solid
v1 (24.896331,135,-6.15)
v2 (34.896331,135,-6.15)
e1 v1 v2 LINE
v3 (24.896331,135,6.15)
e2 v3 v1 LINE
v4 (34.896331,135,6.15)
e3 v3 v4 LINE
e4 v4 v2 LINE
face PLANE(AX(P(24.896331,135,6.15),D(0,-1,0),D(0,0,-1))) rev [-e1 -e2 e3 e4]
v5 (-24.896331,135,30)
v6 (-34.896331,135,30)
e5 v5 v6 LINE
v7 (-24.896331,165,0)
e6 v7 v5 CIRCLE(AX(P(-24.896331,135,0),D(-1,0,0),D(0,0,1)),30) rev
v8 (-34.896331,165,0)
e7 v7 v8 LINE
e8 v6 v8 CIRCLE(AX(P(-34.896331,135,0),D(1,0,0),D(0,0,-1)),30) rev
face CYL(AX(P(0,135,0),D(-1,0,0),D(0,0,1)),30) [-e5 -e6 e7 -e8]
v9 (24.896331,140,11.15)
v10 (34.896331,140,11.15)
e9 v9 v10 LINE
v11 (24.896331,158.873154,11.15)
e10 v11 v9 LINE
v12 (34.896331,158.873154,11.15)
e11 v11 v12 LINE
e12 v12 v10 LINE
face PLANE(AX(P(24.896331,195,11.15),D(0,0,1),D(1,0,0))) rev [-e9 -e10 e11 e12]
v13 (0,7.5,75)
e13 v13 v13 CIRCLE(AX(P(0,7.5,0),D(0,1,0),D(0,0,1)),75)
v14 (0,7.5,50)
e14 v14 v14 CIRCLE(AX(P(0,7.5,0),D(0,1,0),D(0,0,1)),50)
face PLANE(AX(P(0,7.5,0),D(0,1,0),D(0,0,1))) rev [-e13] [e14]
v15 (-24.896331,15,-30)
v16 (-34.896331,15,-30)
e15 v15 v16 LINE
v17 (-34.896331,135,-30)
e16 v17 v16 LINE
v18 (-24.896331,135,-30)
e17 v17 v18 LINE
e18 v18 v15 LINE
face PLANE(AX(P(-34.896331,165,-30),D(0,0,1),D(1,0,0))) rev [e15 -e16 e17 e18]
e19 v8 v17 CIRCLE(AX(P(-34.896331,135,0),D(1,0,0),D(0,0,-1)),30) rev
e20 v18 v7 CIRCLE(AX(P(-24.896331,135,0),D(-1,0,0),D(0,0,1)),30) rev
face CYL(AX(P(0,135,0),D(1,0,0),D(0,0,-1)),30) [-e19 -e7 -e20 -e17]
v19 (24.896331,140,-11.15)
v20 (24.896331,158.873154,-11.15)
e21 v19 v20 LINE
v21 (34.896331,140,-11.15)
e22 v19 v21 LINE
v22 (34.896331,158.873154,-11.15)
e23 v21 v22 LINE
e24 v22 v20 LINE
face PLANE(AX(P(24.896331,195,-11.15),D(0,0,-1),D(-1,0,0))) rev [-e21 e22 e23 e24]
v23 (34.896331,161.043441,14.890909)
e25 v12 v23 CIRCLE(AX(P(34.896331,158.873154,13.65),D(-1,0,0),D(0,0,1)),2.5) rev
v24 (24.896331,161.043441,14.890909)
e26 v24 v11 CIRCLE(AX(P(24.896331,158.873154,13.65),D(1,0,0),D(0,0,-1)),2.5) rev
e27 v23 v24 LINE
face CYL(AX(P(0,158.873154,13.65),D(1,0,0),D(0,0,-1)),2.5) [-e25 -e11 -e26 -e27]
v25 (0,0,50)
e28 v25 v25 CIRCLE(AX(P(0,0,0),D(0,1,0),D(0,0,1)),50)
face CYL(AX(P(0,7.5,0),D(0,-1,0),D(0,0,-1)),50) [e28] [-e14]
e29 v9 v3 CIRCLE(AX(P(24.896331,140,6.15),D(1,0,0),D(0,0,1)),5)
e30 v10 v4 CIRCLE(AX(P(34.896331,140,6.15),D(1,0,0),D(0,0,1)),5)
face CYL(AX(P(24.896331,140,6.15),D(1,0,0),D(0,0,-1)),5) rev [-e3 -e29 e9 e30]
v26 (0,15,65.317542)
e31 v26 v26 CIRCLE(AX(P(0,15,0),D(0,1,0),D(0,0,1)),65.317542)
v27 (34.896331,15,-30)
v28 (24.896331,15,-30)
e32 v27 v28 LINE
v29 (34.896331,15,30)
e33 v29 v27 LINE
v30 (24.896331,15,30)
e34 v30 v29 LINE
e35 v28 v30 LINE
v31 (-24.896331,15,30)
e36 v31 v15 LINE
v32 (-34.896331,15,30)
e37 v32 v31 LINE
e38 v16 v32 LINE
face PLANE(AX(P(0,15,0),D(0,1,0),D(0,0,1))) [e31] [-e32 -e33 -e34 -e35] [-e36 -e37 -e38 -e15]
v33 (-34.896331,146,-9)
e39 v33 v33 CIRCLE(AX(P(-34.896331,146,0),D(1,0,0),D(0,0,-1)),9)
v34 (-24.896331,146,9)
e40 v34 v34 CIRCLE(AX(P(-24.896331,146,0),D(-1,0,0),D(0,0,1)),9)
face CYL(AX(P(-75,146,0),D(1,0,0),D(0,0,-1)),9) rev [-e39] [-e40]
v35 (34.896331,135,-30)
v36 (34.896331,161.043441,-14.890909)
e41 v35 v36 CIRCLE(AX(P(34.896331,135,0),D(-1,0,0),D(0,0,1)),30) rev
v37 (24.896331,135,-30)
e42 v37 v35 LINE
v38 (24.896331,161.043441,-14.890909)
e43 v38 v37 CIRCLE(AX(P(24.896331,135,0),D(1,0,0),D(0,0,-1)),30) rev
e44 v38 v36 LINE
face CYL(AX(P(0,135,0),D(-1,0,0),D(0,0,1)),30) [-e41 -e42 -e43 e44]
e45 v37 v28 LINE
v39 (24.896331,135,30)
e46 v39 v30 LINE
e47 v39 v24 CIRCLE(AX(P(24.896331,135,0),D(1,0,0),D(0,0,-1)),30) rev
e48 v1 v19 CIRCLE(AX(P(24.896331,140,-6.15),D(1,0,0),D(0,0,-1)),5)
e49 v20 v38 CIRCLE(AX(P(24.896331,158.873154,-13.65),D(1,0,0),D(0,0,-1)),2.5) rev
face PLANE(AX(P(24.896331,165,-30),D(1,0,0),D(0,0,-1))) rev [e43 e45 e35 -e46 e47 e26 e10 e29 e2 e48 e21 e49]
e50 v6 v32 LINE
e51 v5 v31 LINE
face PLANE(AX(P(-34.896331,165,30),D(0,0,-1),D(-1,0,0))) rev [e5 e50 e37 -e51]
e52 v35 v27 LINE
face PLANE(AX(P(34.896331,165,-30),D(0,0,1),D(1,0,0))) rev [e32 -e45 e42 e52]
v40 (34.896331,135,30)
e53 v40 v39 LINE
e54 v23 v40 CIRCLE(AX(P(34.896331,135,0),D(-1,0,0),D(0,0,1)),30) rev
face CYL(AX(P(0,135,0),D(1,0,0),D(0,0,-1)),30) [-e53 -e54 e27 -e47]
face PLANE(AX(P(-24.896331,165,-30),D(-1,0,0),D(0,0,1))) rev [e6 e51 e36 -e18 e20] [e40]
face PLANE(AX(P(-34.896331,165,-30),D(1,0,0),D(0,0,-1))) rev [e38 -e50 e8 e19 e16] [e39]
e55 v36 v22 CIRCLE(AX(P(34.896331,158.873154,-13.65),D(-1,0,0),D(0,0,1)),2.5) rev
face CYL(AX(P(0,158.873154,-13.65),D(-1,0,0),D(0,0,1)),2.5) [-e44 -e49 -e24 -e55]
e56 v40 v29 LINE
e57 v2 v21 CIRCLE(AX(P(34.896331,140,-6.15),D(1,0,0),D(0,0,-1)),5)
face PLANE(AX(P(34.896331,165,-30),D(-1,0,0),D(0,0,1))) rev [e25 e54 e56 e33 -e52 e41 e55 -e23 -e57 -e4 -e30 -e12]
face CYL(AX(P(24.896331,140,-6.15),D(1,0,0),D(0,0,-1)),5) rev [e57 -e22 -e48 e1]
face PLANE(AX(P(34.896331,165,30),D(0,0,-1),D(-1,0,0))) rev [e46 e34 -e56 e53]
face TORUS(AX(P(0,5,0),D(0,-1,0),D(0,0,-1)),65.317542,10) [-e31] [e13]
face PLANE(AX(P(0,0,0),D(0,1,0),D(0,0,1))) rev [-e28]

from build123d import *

# Parameters (mm, degrees)
SKETCH1_R           = 50
BOSS_EXTRUDE1_DEPTH = 7.5
SKETCH2_R           = 75
BOSS_EXTRUDE2_DEPTH = 7.5
SKETCH3_W           = 10
SKETCH3_H           = 60
BOSS_EXTRUDE3_DEPTH = 150
FILLET1_R           = 30
FILLET2_R           = 10
CUT_EXTRUDE1_DEPTH  = 10
FILLET3_R           = 2.5
SKETCH5_R           = 9
CUT_EXTRUDE6_DEPTH  = 212.960382158


# Some blends are built 0.0001 mm under size
with BuildPart() as part:
    # Sketch1 → Boss-Extrude1 (new body)
    with BuildSketch(Plane(origin=(0, 0, 0), x_dir=(1, 0, 0), z_dir=(0, 1, 0))):
        with Locations(Location((0, 0, 0), (0, 0, 270))):
            Circle(SKETCH1_R)
    extrude(amount=BOSS_EXTRUDE1_DEPTH)

    # Sketch2 → Boss-Extrude2 (add)
    with BuildSketch(Plane(origin=(0, 7.5, 0), x_dir=(1, 0, 0), z_dir=(0, 1, 0))):
        with Locations(Location((0, 0, 0), (0, 0, 270))):
            Circle(SKETCH2_R)
    extrude(amount=BOSS_EXTRUDE2_DEPTH)

    # Sketch3 → Boss-Extrude3 (add)
    with BuildSketch(Plane(origin=(0, 15, 0), x_dir=(1, 0, 0), z_dir=(0, 1, 0))):
        with Locations((29.896331169, 0)):
            Rectangle(SKETCH3_W, SKETCH3_H)
        with Locations((-29.896331169, 0)):
            Rectangle(SKETCH3_W, SKETCH3_H)
    extrude(amount=BOSS_EXTRUDE3_DEPTH)

    # Fillet1
    fillet1_edges = [part.edges().sort_by_distance(p)[0] for p in [
        (29.896331169, 165, 30),
        (-29.896331169, 165, 30),
        (-29.896331169, 165, -30),
        (29.896331169, 165, -30),
    ]]
    fillet(fillet1_edges, radius=FILLET1_R - 0.0001)  # a hair under: the kernel refuses the full size

    # Fillet2
    # the kernel refuses this fillet: 10 mm, written as the material it takes off along each edge
    with BuildSketch(Plane(origin=(0, 15, 0), x_dir=(0, 0, 1), z_dir=(-1, 0, 0))) as fillet2_piece_1:
        with BuildLine():
            CenterArc((65.317541634, -10), FILLET2_R, 14.477512186, 75.522487814)
            Line((75, -7.5), (75.193649167, -7.45))
            ThreePointArc((75.193649167, -7.45), (75.2, -3.75), (75.2, 0))
            Line((75.2, 0), (75, 0.2))
            Line((75, 0.2), (65.317541634, 0.2))
            Line((65.317541634, 0.2), (65.317541634, 0))
        make_face()
    revolve(axis=Axis((0, 15, 0), (0, 1, 0)), mode=Mode.SUBTRACT)

    # Sketch4 → Cut-Extrude1 (cut)
    with BuildSketch(Plane(origin=(34.896331169, 0, 0), x_dir=(0, 0, -1), z_dir=(1, 0, 0))):
        with BuildLine():
            Line((-11.15, 195), (11.15, 195))
            Line((11.15, 195), (11.15, 140))
            ThreePointArc((11.15, 140), (9.685533906, 136.464466094), (6.15, 135))
            Line((6.15, 135), (-6.15, 135))
            ThreePointArc((-6.15, 135), (-9.685533906, 136.464466094), (-11.15, 140))
            Line((-11.15, 140), (-11.15, 195))
        make_face()
    extrude(amount=-CUT_EXTRUDE1_DEPTH, mode=Mode.SUBTRACT)

    # Fillet3
    fillet3_edges = [part.edges().sort_by_distance(p)[0] for p in [
        (29.896331169, 162.851019733, 11.15),
        (29.896331169, 162.851019733, -11.15),
    ]]
    fillet(fillet3_edges, radius=FILLET3_R)

    # Sketch5 → Cut-Extrude6 (cut, through all)
    with BuildSketch(Plane(origin=(34.896331169, 0, 0), x_dir=(0, 0, -1), z_dir=(1, 0, 0))):
        with Locations((0, 146)):
            Circle(SKETCH5_R)
    extrude(amount=-CUT_EXTRUDE6_DEPTH, mode=Mode.SUBTRACT)


solid = part.part
